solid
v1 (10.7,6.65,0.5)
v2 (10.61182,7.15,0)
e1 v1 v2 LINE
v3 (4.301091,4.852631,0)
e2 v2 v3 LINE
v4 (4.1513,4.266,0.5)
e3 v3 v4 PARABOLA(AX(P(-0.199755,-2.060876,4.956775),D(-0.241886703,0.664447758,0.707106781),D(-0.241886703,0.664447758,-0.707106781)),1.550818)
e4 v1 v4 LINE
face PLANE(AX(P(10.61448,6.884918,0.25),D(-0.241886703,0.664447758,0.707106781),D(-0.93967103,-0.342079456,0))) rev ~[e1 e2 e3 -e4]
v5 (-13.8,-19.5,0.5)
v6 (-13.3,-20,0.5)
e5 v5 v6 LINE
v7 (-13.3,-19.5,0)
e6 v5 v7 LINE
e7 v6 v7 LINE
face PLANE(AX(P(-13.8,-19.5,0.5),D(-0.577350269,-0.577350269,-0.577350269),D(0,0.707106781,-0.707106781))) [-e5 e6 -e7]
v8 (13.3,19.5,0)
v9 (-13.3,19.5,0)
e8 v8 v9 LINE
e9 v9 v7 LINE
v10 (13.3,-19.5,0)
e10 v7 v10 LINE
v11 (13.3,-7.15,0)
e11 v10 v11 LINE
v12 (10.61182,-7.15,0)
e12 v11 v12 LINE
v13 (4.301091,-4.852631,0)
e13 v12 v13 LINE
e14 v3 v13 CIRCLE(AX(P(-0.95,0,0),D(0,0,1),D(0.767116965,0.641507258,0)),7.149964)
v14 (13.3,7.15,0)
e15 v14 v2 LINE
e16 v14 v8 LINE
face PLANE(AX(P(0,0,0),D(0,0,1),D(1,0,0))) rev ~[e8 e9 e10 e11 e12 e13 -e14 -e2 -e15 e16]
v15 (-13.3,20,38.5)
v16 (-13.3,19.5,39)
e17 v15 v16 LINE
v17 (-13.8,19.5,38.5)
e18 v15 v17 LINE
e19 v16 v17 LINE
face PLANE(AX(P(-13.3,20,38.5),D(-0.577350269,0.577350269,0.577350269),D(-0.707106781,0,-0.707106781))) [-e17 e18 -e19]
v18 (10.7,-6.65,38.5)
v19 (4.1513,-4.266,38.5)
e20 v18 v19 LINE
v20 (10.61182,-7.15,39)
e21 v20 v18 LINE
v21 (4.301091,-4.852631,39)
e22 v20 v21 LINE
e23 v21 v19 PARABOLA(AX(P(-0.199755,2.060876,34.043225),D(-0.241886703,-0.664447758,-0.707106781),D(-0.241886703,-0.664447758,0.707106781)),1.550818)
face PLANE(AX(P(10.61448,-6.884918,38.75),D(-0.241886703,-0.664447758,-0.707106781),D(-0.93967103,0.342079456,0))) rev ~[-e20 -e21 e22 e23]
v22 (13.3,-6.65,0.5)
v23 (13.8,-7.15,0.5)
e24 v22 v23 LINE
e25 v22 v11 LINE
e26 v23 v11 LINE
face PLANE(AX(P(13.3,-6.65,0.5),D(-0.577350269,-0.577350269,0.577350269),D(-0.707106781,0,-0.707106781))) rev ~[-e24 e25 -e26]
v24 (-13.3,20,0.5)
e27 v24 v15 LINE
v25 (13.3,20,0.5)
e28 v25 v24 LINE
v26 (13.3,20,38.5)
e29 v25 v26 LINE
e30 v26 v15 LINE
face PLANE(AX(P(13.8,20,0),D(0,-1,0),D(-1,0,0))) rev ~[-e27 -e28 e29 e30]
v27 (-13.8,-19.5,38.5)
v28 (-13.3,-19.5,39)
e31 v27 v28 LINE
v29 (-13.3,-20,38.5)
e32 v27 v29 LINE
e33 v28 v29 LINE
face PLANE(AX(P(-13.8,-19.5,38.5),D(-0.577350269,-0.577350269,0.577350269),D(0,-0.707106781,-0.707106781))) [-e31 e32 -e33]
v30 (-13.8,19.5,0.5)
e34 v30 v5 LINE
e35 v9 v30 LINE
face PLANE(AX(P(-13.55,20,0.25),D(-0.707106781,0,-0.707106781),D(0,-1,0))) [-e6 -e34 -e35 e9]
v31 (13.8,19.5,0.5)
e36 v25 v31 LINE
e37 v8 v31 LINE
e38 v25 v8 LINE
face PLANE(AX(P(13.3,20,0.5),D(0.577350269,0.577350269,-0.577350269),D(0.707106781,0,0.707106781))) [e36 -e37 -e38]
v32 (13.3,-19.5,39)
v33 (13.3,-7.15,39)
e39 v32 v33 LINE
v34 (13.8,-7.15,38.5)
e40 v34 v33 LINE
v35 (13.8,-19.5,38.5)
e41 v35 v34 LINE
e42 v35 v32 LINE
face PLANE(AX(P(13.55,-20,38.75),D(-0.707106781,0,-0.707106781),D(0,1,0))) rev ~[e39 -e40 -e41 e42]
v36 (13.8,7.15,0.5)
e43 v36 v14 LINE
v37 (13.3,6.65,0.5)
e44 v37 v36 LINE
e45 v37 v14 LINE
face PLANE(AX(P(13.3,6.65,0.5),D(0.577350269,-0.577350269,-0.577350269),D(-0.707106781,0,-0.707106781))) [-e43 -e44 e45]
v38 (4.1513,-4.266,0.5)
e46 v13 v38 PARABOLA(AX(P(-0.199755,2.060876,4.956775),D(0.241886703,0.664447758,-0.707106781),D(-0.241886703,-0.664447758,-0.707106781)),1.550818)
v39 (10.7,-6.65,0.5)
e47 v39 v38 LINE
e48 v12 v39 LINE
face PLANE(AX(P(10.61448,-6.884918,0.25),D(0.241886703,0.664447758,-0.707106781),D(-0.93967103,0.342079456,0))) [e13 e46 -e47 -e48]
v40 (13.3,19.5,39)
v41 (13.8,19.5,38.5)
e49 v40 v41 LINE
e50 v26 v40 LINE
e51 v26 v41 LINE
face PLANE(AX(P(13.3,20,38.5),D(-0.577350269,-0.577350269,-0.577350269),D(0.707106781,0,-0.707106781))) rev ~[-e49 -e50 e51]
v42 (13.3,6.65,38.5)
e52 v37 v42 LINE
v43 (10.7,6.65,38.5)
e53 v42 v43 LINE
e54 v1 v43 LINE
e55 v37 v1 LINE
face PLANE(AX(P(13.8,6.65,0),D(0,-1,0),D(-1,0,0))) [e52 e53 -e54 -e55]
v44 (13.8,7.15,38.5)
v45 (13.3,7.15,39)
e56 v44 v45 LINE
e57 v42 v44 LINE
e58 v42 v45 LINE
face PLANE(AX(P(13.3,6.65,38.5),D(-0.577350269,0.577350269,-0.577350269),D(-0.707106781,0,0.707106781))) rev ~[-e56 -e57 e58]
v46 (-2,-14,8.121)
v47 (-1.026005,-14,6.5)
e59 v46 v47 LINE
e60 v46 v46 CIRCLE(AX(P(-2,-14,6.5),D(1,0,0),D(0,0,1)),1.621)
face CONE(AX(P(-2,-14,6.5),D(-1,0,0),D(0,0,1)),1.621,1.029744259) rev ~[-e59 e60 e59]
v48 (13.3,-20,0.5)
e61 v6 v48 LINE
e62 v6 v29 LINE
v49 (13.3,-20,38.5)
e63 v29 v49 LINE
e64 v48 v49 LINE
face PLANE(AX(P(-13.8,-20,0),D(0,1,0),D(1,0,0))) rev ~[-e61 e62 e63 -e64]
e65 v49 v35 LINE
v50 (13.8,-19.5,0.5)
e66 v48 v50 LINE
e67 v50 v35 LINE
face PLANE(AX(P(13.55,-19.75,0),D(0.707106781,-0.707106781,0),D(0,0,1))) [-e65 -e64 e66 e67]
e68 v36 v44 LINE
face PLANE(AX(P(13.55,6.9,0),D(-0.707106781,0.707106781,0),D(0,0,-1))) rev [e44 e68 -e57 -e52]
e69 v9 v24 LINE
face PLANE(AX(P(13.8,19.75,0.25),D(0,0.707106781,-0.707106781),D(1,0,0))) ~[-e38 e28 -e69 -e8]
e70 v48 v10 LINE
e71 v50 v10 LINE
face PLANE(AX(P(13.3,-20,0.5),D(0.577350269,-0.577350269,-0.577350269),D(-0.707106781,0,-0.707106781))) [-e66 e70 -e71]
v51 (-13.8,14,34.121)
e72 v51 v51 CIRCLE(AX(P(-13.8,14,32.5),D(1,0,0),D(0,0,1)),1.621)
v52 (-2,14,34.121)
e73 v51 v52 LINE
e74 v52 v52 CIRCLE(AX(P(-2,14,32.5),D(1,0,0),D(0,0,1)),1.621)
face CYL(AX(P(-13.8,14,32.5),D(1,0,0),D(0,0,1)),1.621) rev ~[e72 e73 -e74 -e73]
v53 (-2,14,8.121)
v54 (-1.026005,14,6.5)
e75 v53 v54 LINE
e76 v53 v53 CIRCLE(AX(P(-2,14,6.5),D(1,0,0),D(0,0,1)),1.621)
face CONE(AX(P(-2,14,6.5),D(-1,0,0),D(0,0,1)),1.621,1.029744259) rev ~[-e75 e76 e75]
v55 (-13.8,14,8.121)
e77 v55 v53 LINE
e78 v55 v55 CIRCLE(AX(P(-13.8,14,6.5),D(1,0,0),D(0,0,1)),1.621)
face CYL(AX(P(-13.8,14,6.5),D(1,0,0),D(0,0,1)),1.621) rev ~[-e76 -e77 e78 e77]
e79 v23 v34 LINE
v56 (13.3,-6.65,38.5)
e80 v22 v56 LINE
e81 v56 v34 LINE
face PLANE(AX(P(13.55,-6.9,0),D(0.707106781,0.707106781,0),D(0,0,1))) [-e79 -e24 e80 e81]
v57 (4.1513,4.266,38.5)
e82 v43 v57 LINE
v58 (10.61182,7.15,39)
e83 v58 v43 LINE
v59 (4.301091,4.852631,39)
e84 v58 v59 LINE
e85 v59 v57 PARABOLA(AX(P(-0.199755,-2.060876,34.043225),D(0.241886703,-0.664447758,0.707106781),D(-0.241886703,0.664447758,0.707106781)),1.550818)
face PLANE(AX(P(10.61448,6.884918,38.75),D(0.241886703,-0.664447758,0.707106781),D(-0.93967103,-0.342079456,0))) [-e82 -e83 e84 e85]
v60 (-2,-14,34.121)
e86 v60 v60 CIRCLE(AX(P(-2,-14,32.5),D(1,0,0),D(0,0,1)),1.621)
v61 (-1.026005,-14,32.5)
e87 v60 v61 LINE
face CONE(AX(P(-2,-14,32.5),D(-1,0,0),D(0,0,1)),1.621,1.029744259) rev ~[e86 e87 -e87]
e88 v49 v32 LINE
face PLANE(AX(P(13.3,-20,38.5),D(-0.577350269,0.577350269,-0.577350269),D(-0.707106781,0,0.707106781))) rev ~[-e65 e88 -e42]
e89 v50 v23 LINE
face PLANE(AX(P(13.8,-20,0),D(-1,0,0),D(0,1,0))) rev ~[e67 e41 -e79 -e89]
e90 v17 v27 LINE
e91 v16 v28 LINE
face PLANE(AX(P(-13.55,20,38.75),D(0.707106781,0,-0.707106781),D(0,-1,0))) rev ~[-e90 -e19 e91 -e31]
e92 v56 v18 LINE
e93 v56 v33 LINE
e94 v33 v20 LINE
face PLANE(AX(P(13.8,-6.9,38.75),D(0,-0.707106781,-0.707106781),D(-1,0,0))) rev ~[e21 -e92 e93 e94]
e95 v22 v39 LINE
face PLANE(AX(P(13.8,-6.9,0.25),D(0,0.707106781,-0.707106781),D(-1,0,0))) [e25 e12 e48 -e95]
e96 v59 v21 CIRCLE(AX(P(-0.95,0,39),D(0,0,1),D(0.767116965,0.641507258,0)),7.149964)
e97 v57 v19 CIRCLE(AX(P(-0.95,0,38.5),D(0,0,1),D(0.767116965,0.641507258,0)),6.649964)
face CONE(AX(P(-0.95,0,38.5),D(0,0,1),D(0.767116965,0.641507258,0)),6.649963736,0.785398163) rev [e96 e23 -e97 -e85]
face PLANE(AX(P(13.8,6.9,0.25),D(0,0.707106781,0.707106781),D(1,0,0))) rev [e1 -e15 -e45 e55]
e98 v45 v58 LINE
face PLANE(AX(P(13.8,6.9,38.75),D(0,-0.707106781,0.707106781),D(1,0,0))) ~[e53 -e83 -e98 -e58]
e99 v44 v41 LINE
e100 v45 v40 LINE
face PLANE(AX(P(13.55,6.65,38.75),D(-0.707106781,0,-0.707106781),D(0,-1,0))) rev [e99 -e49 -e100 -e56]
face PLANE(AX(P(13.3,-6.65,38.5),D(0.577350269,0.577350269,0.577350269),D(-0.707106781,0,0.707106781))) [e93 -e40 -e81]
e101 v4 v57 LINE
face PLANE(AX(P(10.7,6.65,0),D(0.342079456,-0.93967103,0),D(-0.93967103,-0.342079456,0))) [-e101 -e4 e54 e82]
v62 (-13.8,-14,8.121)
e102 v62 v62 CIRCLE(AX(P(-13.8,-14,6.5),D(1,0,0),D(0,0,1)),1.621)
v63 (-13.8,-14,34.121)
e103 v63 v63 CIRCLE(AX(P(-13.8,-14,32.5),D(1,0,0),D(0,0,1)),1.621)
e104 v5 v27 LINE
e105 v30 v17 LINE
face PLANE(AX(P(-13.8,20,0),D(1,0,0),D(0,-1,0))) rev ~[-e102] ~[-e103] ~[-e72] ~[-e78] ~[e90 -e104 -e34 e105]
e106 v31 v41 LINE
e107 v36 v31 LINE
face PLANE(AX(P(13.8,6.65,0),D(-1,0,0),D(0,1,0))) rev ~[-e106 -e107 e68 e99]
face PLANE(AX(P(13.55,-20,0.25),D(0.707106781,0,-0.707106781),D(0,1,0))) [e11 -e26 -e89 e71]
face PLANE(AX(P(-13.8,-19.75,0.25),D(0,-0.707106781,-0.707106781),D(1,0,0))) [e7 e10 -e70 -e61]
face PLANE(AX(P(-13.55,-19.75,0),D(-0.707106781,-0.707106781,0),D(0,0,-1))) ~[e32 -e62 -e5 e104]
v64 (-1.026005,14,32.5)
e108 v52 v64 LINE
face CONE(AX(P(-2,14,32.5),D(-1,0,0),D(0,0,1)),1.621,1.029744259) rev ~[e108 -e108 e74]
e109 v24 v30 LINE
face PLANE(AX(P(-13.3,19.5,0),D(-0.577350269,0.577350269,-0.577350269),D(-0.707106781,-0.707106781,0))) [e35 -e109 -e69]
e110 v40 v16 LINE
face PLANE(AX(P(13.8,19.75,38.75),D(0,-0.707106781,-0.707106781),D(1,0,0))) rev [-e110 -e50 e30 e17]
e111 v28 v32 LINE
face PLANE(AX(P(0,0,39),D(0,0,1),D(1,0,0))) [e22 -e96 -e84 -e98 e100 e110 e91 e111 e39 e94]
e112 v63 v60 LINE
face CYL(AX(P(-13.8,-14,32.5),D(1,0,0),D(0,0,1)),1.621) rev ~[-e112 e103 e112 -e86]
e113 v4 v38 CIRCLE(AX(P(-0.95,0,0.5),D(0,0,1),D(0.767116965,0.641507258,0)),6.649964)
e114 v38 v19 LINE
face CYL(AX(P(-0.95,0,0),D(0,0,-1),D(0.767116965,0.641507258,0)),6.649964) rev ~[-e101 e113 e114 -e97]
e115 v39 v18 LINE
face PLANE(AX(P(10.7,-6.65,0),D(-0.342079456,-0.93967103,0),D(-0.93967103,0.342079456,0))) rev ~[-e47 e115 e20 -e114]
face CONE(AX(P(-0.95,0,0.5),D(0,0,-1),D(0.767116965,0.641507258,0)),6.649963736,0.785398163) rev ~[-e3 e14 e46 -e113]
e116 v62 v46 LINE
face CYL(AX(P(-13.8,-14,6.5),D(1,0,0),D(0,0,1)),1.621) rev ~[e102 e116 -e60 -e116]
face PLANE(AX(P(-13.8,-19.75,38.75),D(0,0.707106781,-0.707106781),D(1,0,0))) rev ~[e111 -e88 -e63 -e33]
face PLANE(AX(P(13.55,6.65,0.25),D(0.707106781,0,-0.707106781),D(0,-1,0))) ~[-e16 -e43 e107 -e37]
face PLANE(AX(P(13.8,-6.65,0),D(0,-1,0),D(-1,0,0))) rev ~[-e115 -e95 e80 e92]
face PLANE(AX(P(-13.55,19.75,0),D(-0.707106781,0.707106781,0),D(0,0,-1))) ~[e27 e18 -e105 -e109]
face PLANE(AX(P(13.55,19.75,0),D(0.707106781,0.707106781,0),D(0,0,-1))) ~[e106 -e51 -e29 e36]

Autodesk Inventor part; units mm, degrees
ref_plane "YZ Plane" through (0, 0, 0) normal (1, 0, 0) x (0, 1, 0)
ref_plane "XZ Plane" through (0, 0, 0) normal (0, 1, 0) x (-1, 0, 0)
ref_plane "XY Plane" through (0, 0, 0) normal (0, 0, 1) x (1, 0, 0)
sketch "Skizze1" plane through (0, 0, 0) normal (0, 0, 1) x (1, 0, 0)
  line L0 (13.8, 20) -> (-13.8, 20)
  line L1 (-13.8, 20) -> (-13.8, -20)
  line L2 (-13.8, -20) -> (13.8, -20)
  line L3 (13.8, 20) -> (-13.8, -20) construction
  line L4 (-13.8, 20) -> (13.8, -20) construction
  line L5 (13.8, 20) -> (13.8, 6.65) construction
  line L6 (13.8, 6.65) -> (10.7, 6.65)
  line L7 (-13.8, 0) -> (-0.95, 0) construction
  arc A0 (4.1513, 4.266) -> (4.1513, -4.266) centre (-0.95, 0) ccw
  line L8 (13.8, 6.65) -> (13.8, -6.65) construction
  line L9 (13.8, -6.65) -> (10.7, -6.65)
  line L10 (13.8, -20) -> (13.8, -6.65)
  line L11 (13.8, 6.65) -> (13.8, 20)
  line L12 (10.7, 6.65) -> (4.1513, 4.266)
  line L13 (10.7, -6.65) -> (4.1513, -4.266)
  point P0 (0, 0)
  dimension "d0" = 27.6
  dimension "d1" = 40
  dimension "d2" = 13.35
  dimension "d3" = 3.1
  dimension "d4" = 12.85
  dimension "d5" = 13.3
  dimension "d7" = 13.3
  dimension "d8" = 3.1
  dimension "d24" = 6.5487
  dimension "d25" = 6.5487
extrude "Extrusion1" add sketch "Skizze1" along normal blind 39
sketch "Skizze2" plane through (-13.8, -20, 0) normal (-1, 0, 0) x (0, 0, 1)
  line L0 (0, 40) -> (39, 40) construction
  line L1 (0, 0) -> (39, 0) construction
  line L2 (0, 40) -> (39, 0) construction
  line L3 (39, 40) -> (0, 0) construction
  line L4 (6.5, 6) -> (32.5, 6) construction
  line L5 (32.5, 6) -> (32.5, 34) construction
  line L6 (32.5, 34) -> (6.5, 34) construction
  line L7 (6.5, 34) -> (6.5, 6) construction
  line L8 (6.5, 6) -> (32.5, 34) construction
  line L9 (32.5, 6) -> (6.5, 34) construction
  point P0 (0, 20)
  point P1 (19.5, 20)
  dimension "d12" = 26
  dimension "d13" = 28
hole "Bohrung1" at (-13.8, 14, 6.5) at (-13.8, 14, 32.5) at (-13.8, -14, 32.5) at (-13.8, -14, 6.5) direction (1, 0, 0) diameter 3.242 depth 11.8 tip angle 118 thread size "M4x0.7" class "6H" standard "ANSI Metric M Profile"
chamfer "Fase1" distance 0.5 angle 45 26 edges at (13.8, 13.325, 39) (13.8, 13.325, 0) (13.8, -13.325, 0) (13.8, -13.325, 39) (13.8, -20, 19.5) (0, -20, 39) (-13.8, 0, 39) (0, 20, 39) (-13.8, 20, 19.5) (0, 20, 0) (13.8, 6.65, 19.5) (13.8, -6.65, 19.5) (-7.6, 0, 39) (7.4257, -5.458, 39) (12.25, -6.65, 39) (7.4257, 5.458, 39) (12.25, 6.65, 39) (-7.6, 0, 0) (7.4257, -5.458, 0) (12.25, -6.65, 0) (12.25, 6.65, 0) (7.4257, 5.458, 0) (0, -20, 0) (-13.8, -20, 19.5) (-13.8, 0, 0) (13.8, 20, 19.5)
chamfer_without_effect "Fase2"
properties part number "Führungswagen" material "Aluminium 6061"
